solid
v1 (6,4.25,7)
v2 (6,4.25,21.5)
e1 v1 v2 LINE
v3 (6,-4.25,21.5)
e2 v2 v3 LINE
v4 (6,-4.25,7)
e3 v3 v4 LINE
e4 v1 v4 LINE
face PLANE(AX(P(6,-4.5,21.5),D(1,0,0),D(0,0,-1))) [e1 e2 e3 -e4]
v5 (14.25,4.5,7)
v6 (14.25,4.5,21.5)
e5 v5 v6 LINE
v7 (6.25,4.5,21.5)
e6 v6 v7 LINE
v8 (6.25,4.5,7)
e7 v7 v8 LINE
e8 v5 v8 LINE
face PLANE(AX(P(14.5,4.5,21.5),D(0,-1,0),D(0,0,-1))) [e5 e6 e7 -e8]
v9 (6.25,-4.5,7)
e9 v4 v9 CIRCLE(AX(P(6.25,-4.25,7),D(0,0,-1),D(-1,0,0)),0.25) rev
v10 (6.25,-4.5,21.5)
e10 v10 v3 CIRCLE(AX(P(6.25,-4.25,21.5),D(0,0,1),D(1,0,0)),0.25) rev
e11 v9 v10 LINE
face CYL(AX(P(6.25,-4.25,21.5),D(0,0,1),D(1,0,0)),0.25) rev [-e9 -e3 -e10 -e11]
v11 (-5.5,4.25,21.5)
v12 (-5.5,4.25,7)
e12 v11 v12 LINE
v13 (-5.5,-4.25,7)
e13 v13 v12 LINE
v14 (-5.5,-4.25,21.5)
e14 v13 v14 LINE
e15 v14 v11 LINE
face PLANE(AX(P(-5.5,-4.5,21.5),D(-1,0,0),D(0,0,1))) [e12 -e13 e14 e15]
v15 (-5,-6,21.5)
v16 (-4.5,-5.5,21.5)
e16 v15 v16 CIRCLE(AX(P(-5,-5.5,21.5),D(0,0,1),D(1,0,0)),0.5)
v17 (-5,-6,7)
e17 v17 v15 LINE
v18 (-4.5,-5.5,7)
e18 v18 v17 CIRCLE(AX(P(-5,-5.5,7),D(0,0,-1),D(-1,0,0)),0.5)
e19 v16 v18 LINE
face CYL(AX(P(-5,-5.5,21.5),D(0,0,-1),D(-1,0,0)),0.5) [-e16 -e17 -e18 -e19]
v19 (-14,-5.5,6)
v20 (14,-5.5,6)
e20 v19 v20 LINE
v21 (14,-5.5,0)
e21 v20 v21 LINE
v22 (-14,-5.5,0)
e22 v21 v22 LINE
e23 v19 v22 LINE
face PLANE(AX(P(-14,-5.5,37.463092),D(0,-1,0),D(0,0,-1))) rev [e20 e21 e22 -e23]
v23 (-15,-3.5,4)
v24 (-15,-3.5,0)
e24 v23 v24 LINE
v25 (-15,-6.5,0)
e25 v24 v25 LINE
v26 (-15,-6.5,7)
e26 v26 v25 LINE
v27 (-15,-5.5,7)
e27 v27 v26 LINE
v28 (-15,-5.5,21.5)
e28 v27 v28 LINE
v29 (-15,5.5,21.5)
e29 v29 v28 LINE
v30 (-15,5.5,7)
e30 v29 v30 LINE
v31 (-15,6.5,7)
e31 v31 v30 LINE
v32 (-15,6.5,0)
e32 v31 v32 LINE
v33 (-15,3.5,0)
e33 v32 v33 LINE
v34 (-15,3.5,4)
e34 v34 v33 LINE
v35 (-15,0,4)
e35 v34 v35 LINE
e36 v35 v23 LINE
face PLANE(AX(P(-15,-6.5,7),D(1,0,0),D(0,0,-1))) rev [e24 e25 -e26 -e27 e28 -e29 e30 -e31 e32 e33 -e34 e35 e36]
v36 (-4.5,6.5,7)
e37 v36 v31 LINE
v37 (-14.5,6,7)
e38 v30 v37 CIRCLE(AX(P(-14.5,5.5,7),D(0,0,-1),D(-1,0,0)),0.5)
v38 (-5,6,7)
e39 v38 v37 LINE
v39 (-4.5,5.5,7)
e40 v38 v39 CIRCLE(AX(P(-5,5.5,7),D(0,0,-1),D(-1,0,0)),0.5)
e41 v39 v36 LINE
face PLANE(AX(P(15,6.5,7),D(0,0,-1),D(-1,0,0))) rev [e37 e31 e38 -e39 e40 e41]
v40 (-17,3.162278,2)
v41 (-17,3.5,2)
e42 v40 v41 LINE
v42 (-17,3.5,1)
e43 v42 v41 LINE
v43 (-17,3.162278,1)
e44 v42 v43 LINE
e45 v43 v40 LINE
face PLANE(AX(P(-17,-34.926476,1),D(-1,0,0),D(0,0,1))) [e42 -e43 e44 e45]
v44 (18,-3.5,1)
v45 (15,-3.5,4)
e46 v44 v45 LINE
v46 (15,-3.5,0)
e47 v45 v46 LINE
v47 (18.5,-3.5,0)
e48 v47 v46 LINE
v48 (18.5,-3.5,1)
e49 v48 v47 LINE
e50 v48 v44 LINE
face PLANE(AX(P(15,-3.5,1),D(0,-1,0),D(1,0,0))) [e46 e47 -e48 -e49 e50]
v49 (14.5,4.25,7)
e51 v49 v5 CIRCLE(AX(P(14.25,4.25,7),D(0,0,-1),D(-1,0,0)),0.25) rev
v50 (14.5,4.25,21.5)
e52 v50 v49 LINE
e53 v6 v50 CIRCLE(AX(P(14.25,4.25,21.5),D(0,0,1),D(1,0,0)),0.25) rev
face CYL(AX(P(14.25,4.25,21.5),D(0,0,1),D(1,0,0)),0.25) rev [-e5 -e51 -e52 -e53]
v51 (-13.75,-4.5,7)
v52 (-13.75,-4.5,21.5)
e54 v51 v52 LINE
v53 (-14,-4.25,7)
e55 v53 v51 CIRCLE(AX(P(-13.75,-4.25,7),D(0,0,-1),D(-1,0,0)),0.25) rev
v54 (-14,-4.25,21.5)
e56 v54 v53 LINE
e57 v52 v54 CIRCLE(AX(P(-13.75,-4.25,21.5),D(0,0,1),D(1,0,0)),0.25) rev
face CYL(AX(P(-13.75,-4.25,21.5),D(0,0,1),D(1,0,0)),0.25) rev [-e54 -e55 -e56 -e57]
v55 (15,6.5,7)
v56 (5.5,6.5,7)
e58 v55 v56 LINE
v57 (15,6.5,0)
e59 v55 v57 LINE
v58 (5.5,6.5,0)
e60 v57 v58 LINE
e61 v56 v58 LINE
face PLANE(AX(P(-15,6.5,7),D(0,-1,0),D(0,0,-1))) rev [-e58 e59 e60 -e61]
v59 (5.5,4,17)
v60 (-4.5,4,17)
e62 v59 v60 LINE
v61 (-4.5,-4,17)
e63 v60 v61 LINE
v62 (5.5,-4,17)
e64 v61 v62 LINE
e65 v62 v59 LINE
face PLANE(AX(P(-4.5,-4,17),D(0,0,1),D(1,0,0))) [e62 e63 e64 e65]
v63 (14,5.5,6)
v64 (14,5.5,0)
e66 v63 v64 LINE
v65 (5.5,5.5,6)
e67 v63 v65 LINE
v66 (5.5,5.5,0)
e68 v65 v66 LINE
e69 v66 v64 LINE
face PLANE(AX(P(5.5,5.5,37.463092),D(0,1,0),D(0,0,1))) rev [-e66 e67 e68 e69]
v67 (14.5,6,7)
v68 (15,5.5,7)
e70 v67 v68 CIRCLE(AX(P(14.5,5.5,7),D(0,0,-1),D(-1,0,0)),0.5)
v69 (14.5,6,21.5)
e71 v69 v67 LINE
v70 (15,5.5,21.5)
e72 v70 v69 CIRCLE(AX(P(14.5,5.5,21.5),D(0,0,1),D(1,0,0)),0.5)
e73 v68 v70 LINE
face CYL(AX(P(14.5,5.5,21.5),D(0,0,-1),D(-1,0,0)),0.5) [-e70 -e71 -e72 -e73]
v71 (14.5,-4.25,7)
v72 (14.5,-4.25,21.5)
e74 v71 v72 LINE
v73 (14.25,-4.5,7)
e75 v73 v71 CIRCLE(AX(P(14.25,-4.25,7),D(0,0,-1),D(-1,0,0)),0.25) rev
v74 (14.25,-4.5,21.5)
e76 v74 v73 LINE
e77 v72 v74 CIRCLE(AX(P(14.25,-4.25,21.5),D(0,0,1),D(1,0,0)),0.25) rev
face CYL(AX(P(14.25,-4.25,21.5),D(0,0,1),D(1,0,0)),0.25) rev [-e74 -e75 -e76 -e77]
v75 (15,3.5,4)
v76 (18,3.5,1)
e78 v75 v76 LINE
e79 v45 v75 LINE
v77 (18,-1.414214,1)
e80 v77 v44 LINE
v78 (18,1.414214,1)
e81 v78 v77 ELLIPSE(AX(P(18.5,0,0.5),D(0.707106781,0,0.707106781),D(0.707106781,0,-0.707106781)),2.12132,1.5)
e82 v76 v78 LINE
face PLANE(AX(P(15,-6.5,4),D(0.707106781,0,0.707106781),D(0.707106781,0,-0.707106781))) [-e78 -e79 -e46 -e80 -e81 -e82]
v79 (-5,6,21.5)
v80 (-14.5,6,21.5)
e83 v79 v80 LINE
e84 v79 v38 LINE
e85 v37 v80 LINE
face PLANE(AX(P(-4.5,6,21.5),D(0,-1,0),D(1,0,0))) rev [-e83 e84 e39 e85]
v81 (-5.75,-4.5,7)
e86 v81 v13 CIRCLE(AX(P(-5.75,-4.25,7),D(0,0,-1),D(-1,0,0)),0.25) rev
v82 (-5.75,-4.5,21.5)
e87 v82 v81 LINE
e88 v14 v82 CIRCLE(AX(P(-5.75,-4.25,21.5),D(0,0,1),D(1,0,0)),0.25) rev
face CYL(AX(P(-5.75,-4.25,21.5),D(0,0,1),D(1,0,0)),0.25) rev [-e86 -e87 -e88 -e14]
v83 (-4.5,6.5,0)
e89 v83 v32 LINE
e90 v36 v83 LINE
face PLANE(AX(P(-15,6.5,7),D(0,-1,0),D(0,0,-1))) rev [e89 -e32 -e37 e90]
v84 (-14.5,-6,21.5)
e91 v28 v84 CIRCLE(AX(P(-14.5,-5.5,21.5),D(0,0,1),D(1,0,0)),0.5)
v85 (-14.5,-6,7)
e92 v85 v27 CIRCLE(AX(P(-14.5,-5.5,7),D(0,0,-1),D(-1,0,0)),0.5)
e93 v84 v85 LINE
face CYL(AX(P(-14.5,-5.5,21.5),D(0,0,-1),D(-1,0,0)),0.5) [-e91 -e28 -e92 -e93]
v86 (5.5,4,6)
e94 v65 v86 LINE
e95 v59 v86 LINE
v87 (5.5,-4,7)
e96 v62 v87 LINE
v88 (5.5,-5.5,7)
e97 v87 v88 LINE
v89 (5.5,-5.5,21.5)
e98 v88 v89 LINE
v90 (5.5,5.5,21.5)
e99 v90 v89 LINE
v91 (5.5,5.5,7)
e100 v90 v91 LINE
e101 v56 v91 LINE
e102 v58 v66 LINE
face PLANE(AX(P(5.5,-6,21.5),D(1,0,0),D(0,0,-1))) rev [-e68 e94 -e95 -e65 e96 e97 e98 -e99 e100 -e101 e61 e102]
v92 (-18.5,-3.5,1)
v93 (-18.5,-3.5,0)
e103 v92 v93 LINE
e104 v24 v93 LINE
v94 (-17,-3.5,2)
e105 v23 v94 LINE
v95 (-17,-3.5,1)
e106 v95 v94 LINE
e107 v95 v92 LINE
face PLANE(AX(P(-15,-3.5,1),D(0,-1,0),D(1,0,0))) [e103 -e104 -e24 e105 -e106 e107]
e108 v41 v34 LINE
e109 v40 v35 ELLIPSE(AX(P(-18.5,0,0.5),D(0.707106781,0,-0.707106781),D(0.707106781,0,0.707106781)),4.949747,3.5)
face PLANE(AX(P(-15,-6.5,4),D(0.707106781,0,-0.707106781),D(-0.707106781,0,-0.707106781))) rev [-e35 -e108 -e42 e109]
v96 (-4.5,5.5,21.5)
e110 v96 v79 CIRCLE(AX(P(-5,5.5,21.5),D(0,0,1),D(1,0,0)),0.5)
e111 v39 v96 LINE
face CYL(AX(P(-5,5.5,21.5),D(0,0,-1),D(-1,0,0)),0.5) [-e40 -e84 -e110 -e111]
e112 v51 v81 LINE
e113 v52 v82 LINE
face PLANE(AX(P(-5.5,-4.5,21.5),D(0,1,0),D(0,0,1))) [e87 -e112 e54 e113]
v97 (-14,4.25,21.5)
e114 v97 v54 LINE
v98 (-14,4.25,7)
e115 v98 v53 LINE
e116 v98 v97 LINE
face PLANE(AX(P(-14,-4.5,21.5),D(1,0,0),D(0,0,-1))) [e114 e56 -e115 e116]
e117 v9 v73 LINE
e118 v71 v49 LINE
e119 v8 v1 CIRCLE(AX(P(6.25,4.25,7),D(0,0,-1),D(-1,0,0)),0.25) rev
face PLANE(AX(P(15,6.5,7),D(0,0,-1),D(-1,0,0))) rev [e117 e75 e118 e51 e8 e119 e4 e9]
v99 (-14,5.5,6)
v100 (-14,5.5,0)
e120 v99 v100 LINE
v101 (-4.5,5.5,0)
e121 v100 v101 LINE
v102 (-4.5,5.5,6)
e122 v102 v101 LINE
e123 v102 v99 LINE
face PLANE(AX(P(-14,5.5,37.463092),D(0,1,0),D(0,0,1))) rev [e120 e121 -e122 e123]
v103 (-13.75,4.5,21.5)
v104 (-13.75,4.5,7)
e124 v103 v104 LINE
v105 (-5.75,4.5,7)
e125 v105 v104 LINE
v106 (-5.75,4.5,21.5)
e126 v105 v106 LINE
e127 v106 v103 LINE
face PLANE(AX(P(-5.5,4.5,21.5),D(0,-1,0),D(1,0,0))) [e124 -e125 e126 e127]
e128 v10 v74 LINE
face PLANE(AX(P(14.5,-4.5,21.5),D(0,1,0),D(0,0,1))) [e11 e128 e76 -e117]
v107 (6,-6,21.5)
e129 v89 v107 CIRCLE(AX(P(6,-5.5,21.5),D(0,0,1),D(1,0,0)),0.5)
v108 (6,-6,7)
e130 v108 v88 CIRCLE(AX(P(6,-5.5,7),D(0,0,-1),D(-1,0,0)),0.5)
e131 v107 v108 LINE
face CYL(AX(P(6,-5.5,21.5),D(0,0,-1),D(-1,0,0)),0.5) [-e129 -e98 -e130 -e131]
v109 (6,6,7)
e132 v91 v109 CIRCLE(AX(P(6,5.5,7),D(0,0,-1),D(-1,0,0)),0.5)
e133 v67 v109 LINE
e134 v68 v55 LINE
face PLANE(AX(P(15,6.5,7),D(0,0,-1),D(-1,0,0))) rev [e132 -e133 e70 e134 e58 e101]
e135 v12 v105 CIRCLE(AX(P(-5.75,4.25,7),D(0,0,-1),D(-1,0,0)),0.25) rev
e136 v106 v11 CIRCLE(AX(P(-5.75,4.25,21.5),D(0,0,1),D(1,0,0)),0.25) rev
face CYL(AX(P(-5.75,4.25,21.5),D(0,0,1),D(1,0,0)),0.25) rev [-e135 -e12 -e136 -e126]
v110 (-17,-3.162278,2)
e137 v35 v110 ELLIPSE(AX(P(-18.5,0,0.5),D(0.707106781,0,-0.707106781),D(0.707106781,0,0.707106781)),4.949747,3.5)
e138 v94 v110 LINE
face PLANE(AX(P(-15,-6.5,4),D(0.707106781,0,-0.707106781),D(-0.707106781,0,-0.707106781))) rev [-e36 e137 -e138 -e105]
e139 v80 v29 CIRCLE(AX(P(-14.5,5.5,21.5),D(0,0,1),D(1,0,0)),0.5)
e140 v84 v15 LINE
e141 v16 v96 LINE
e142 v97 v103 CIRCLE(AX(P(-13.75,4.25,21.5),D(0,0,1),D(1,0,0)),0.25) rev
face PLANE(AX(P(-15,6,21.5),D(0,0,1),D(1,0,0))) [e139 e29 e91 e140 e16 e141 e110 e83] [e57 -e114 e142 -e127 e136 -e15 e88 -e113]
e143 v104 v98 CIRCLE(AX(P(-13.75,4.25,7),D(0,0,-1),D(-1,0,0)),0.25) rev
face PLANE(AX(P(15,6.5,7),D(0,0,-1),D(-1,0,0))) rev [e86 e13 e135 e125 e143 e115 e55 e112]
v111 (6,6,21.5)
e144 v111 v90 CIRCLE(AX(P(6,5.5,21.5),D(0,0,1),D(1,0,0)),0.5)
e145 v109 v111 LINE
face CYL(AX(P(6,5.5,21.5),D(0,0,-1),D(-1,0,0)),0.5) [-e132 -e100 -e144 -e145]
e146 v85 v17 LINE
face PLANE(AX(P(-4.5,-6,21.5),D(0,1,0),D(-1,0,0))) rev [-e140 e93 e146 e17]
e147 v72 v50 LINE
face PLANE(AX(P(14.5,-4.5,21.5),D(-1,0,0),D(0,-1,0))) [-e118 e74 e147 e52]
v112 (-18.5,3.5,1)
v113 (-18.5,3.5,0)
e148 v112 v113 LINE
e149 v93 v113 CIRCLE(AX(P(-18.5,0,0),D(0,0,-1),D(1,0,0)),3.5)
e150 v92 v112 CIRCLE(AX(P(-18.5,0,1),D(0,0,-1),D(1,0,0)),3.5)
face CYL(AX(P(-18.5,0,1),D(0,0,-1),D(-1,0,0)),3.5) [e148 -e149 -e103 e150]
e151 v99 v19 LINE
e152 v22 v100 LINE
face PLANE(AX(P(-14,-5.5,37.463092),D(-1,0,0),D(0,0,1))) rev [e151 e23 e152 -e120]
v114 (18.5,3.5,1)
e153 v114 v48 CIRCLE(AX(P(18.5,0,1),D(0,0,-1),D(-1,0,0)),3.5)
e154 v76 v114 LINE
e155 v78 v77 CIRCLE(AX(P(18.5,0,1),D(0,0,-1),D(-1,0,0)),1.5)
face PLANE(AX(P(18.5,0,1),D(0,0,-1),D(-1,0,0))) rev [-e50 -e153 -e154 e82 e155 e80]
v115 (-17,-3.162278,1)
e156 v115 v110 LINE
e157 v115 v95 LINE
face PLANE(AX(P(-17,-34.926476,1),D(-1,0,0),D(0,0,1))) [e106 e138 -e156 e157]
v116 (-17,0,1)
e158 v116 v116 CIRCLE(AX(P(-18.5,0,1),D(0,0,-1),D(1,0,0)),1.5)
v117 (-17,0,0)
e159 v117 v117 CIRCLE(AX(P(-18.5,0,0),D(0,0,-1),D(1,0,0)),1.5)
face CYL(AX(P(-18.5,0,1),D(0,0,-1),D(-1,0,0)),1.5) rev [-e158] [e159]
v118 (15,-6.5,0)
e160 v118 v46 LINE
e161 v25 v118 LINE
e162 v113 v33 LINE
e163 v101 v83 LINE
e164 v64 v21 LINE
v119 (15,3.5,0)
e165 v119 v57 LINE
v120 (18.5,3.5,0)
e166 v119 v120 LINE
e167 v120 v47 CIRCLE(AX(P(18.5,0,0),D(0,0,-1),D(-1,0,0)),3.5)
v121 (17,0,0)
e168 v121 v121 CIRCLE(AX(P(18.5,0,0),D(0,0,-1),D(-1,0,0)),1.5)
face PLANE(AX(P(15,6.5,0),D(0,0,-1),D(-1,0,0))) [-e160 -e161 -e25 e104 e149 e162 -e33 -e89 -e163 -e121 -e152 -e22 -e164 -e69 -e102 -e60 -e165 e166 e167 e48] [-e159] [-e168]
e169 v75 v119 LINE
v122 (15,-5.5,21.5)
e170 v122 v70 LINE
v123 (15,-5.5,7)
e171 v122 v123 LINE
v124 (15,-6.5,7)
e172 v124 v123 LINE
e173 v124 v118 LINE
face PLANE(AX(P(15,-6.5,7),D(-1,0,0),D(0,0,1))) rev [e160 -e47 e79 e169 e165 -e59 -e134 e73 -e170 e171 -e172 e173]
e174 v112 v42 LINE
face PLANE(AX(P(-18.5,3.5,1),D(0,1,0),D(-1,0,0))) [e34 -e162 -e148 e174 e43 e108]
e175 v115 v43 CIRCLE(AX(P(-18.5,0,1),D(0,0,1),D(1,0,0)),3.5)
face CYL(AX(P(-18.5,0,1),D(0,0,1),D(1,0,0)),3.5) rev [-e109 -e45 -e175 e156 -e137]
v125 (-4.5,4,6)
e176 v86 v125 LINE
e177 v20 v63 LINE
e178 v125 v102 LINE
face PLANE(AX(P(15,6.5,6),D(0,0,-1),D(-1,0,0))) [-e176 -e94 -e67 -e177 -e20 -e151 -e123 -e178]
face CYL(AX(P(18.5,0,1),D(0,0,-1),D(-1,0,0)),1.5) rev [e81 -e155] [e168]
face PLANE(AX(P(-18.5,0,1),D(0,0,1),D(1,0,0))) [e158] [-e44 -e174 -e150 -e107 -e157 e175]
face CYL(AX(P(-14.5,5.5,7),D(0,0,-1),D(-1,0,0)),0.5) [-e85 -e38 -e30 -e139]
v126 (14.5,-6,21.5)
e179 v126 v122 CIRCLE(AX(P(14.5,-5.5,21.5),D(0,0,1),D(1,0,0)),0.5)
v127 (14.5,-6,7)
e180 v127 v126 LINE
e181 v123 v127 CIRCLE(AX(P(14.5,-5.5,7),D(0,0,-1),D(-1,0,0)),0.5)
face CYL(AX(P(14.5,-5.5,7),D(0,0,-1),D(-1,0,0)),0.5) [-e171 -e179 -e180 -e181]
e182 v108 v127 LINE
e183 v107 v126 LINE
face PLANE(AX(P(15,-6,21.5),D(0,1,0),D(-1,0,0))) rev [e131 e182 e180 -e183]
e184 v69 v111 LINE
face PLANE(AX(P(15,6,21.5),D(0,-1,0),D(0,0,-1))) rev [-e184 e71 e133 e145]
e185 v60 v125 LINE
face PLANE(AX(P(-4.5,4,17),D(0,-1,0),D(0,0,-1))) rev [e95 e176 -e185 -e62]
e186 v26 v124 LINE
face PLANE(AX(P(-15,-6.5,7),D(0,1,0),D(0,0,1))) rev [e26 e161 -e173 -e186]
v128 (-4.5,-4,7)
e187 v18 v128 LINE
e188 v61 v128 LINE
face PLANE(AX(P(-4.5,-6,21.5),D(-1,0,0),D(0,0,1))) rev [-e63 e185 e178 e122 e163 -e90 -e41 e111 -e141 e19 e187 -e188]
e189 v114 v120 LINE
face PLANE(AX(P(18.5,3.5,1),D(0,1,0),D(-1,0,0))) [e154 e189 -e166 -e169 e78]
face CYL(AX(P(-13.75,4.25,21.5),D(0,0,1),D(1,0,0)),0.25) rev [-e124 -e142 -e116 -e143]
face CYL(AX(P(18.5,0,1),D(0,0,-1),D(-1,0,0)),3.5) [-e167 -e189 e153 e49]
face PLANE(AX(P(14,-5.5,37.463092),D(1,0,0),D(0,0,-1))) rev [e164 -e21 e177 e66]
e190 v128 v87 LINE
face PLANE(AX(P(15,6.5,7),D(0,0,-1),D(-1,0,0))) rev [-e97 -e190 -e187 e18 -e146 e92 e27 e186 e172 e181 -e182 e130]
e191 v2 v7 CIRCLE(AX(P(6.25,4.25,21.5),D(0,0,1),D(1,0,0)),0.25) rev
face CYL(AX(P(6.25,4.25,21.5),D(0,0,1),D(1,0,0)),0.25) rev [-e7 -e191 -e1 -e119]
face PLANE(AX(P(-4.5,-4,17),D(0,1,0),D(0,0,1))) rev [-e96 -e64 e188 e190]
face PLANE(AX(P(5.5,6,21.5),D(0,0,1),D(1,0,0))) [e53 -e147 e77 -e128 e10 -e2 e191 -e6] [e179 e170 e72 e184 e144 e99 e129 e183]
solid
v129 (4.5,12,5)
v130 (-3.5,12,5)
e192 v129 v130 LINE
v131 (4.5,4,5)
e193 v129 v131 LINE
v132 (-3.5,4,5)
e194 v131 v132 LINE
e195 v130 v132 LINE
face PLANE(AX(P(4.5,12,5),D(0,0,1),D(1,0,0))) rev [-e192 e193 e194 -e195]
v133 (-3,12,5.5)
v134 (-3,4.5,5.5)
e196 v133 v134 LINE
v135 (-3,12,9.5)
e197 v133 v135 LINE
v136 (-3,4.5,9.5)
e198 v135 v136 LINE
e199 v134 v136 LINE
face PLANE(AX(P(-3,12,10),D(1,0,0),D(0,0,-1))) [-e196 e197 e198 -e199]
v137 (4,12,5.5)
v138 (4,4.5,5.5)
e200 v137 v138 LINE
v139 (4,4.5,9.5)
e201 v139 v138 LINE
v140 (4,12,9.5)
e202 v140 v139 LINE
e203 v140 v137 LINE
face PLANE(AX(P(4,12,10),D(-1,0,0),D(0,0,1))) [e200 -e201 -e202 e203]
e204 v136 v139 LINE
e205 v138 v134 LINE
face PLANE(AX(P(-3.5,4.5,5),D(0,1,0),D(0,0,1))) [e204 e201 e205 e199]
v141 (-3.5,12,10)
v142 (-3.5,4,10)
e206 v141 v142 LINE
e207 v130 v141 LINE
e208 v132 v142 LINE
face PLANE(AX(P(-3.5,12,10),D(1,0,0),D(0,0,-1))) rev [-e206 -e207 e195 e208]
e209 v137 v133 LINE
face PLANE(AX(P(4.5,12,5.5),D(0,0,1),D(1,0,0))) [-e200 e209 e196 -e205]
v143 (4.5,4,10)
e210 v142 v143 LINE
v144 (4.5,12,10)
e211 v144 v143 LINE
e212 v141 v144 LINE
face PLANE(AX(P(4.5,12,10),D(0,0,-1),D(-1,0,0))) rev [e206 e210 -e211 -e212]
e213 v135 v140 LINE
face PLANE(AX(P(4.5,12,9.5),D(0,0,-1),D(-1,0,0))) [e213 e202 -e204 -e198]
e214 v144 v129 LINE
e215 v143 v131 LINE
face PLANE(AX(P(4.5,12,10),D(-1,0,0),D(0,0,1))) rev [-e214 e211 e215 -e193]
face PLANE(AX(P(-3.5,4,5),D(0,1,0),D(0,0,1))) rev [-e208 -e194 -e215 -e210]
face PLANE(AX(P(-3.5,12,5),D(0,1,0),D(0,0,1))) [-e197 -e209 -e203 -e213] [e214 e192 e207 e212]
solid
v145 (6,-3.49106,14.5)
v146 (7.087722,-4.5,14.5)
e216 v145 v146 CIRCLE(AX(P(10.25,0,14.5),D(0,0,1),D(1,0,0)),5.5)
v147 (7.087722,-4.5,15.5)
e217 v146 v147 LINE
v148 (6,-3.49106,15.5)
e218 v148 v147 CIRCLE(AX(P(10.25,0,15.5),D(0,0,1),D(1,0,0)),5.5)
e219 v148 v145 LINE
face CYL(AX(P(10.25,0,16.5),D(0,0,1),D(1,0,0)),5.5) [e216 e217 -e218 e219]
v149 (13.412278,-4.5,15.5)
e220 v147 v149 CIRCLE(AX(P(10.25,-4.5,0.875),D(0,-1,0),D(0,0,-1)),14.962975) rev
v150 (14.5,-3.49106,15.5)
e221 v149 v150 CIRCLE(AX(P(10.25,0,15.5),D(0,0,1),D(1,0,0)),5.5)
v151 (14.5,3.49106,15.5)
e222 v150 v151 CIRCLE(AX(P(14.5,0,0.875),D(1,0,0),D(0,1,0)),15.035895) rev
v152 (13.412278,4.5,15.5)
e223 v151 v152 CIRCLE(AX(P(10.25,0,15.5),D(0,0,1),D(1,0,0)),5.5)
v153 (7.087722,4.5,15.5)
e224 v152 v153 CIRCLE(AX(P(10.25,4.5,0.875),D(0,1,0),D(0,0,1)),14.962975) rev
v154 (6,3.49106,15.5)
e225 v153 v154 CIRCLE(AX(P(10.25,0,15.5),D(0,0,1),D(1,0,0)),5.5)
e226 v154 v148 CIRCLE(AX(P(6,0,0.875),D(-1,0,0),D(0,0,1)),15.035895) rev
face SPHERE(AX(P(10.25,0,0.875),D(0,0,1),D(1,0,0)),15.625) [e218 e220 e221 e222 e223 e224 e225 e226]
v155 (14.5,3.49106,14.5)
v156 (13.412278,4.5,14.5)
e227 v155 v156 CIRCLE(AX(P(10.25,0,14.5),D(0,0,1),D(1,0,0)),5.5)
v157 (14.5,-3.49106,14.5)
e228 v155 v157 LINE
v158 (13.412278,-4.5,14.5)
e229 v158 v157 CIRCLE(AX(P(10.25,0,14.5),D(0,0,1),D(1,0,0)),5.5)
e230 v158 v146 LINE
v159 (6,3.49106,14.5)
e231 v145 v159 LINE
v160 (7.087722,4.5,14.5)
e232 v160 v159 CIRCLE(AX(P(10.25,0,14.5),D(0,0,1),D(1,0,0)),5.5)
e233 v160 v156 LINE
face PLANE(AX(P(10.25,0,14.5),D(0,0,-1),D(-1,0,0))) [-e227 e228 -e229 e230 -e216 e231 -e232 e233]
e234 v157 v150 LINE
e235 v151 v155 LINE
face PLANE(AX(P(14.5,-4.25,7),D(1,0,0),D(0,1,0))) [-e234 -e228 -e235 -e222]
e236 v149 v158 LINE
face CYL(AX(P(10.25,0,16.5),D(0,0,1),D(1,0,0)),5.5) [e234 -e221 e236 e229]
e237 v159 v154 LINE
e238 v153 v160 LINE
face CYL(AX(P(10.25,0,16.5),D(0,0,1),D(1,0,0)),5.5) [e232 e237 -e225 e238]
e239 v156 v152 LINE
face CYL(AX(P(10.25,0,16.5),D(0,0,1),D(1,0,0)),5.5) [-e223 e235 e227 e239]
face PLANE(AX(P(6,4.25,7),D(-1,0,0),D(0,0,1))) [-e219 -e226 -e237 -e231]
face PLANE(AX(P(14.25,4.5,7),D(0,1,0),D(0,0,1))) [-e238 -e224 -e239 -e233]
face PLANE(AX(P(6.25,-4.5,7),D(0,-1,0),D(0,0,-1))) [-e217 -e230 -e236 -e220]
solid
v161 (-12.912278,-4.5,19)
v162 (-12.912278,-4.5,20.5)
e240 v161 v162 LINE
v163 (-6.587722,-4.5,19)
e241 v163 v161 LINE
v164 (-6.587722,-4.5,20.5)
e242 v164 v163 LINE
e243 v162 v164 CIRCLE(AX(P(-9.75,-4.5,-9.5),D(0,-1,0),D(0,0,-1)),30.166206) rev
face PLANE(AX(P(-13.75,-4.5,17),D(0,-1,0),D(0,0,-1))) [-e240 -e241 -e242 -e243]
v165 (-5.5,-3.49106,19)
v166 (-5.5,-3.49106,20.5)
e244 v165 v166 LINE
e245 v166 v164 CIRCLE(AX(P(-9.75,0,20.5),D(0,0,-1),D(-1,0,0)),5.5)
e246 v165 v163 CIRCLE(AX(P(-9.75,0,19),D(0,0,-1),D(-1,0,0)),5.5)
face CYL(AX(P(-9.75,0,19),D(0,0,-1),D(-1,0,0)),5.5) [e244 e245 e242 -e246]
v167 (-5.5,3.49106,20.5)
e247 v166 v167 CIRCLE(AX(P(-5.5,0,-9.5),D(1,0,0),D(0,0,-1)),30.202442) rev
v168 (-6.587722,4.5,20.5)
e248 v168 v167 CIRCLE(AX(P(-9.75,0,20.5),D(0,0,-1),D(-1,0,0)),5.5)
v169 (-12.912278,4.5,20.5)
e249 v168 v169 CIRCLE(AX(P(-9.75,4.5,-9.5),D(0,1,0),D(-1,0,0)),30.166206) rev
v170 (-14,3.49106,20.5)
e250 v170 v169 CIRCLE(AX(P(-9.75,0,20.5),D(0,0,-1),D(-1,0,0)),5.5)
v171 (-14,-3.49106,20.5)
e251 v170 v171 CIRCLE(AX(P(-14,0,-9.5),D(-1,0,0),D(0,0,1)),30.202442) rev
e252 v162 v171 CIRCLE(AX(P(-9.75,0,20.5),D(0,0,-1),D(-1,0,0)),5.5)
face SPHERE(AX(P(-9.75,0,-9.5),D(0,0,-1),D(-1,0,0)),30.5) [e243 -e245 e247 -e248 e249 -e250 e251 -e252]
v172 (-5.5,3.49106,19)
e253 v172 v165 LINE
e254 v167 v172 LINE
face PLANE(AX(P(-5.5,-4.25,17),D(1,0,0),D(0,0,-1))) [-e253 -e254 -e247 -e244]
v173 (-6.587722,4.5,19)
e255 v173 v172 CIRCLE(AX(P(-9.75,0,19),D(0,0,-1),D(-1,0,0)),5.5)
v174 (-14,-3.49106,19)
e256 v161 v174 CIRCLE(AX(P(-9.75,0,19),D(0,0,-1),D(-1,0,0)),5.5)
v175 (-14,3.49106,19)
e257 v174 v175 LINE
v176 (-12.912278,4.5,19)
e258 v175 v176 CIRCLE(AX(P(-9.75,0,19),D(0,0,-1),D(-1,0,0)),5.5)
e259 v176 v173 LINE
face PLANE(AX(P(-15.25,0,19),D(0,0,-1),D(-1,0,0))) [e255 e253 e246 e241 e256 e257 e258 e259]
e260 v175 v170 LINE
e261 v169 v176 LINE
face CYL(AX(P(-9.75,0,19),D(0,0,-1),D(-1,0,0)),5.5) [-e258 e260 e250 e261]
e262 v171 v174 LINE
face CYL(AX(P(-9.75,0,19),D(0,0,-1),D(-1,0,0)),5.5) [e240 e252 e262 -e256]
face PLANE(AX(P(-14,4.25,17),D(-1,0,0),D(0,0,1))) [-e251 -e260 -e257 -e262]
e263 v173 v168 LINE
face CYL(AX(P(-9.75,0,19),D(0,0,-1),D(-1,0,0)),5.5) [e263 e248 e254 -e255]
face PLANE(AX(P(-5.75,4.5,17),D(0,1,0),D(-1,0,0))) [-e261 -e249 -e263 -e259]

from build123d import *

# Parameters (mm, degrees)
SKETCH5_W           = 30
SKETCH5_H           = 13
BOSS_EXTRUDE1_DEPTH = 7
SKETCH6_W           = 10.5
SKETCH6_H           = 12
SKETCH6_W_2         = 8.5
SKETCH6_H_2         = 9
SKETCH6_W_3         = 9.5
BOSS_EXTRUDE2_DEPTH = 14.5
SKETCH7_W           = 10
SKETCH7_H           = 8
BOSS_EXTRUDE3_DEPTH = 10
FILLET1_R           = 0.25
FILLET2_R           = 0.5
SKETCH8_R           = 1.5
BOSS_EXTRUDE4_DEPTH = 1
CHAMFER1_SIZE       = 3
CUT_EXTRUDE1_START  = -16
CUT_EXTRUDE1_DEPTH  = 16
SKETCH12_OUTSIDE_W  = 56.134
SKETCH12_OUTSIDE_H  = 25.134
CUT_EXTRUDE2_DEPTH  = 2.5
SKETCH14_OUTSIDE_W  = 56.134
SKETCH14_OUTSIDE_H  = 25.134
CUT_EXTRUDE5_DEPTH  = 7
CUT_EXTRUDE6_DEPTH  = 6
SKETCH16_W          = 10
SKETCH16_H          = 2.5
CUT_EXTRUDE7_DEPTH  = 1
SKETCH17_W          = 8
SKETCH17_H          = 5
BOSS_EXTRUDE5_DEPTH = 8
SHELL1_T            = -0.5


with BuildPart() as part:
    # Sketch5 → Boss-Extrude1 (new body)
    with BuildSketch(Plane.XY):
        Rectangle(SKETCH5_W, SKETCH5_H)
    extrude(amount=BOSS_EXTRUDE1_DEPTH)

    # Sketch6 → Boss-Extrude2 (add)
    # profile 1 of 2: a face of its own
    with BuildSketch(Plane.XY.offset(7)):
        with Locations((-9.75, 0)):
            Rectangle(SKETCH6_W, SKETCH6_H)
        with Locations((-9.75, 0)):
            Rectangle(SKETCH6_W_2, SKETCH6_H_2, mode=Mode.SUBTRACT)
    # profile 2 of 2: a face of its own
    with BuildSketch(Plane.XY.offset(7)):
        with Locations((10.25, 0)):
            Rectangle(SKETCH6_W_3, SKETCH6_H)
        with Locations((10.25, 0)):
            Rectangle(SKETCH6_W_2, SKETCH6_H_2, mode=Mode.SUBTRACT)
    extrude(amount=BOSS_EXTRUDE2_DEPTH)

    # Sketch7 → Boss-Extrude3 (add)
    with BuildSketch(Plane.XY.offset(7)):
        with Locations((0.5, 0)):
            Rectangle(SKETCH7_W, SKETCH7_H)
    extrude(amount=BOSS_EXTRUDE3_DEPTH)

    # Fillet1
    fillet1_edges = [part.edges().sort_by_distance(p)[0] for p in [
        (-14, -4.5, 14.25),
        (-5.5, -4.5, 14.25),
        (-5.5, 4.5, 14.25),
        (-14, 4.5, 14.25),
        (6, -4.5, 14.25),
        (14.5, -4.5, 14.25),
        (14.5, 4.5, 14.25),
        (6, 4.5, 14.25),
    ]]
    fillet(fillet1_edges, radius=FILLET1_R)

    # Fillet2
    fillet2_edges = [part.edges().sort_by_distance(p)[0] for p in [
        (15, -6, 14.25),
        (5.5, -6, 14.25),
        (-4.5, -6, 14.25),
        (-15, -6, 14.25),
        (-15, 6, 14.25),
        (5.5, 6, 14.25),
        (15, 6, 14.25),
        (-4.5, 6, 14.25),
    ]]
    fillet(fillet2_edges, radius=FILLET2_R)

    # Sketch8 → Boss-Extrude4 (add)
    # profile 1 of 2: a face of its own
    with BuildSketch(Plane(origin=(0, 0, 0), x_dir=(-1, 0, 0), z_dir=(0, 0, -1))):
        with BuildLine():
            Line((-18.5, 3.5), (-15, 3.5))
            Line((-15, 3.5), (-15, -3.5))
            Line((-15, -3.5), (-18.5, -3.5))
            ThreePointArc((-18.5, -3.5), (-22, 0), (-18.5, 3.5))
        make_face()
        with Locations((-18.5, 0)):
            Circle(SKETCH8_R, mode=Mode.SUBTRACT)
    # profile 2 of 2: a face of its own
    with BuildSketch(Plane(origin=(0, 0, 0), x_dir=(-1, 0, 0), z_dir=(0, 0, -1))):
        with BuildLine():
            Line((15, -3.5), (18.5, -3.5))
            ThreePointArc((18.5, -3.5), (22, 0), (18.5, 3.5))
            Line((18.5, 3.5), (15, 3.5))
            Line((15, 3.5), (15, -3.5))
        make_face()
        with Locations(Location((18.5, 0, 0), (0, 0, 180))):
            Circle(SKETCH8_R, mode=Mode.SUBTRACT)
    extrude(amount=-BOSS_EXTRUDE4_DEPTH)

    # Chamfer1
    # the kernel refuses this chamfer: 3 mm, written as the material it adds along each edge
    with BuildSketch(Plane(origin=(15, 3.5, 1), x_dir=(-0.0274958766105862, 0, 0.9996219169112968), z_dir=(0, -1, 0))) as chamfer1_piece_1_section:
        Polygon((CHAMFER1_SIZE * 0.999621916911, -CHAMFER1_SIZE * 0.0274958766106), (-CHAMFER1_SIZE * 0.0274958766106, -CHAMFER1_SIZE * 0.999621916911), (0, 0), align=None)
    chamfer1_piece_1 = extrude(amount=7, mode=Mode.PRIVATE)
    chamfer1_piece_1 = chamfer1_piece_1 - Plane(origin=(18.5, 0, 2.014951553), x_dir=(-1, 0, 0), z_dir=(0, 0, -1)) * Cylinder(1.5, 26, mode=Mode.PRIVATE)
    add(chamfer1_piece_1)
    with BuildSketch(Plane(origin=(-15, 3.5, 1), x_dir=(0.0274958766105862, 0, 0.9996219169112968), z_dir=(0, -1, 0))) as chamfer1_piece_2_section:
        Polygon((CHAMFER1_SIZE * 0.999621916911, CHAMFER1_SIZE * 0.0274958766106), (-CHAMFER1_SIZE * 0.0274958766106, CHAMFER1_SIZE * 0.999621916911), (0, 0), align=None)
    chamfer1_piece_2 = extrude(amount=7, mode=Mode.PRIVATE)
    chamfer1_piece_2 = chamfer1_piece_2 - Plane(origin=(-18.5, 0, 2.014951553), x_dir=(1, 0, 0), z_dir=(0, 0, -1)) * Cylinder(1.5, 26, mode=Mode.PRIVATE)
    add(chamfer1_piece_2)

    # Sketch10 → Cut-Extrude1 (cut)
    with BuildSketch(Plane.XY.offset(17).offset(CUT_EXTRUDE1_START)):
        with BuildLine():
            Line((-17, 3.5), (-18.5, 3.5))
            ThreePointArc((-18.5, 3.5), (-22, 0), (-18.5, -3.5))
            Line((-18.5, -3.5), (-17, -3.5))
            Line((-17, -3.5), (-17, -3.16227766))
            ThreePointArc((-17, -3.16227766), (-15.541960108, -1.870828693), (-15, 0))
            ThreePointArc((-15, 0), (-15.541960108, 1.870828693), (-17, 3.16227766))
            Line((-17, 3.16227766), (-17, 3.5))
        make_face()
    extrude(amount=CUT_EXTRUDE1_DEPTH, mode=Mode.SUBTRACT)

    # Sketch15 → Cut-Extrude6 (cut)
    with BuildSketch(Plane(origin=(0, 0, 0), x_dir=(-1, 0, 0), z_dir=(0, 0, -1))):
        Polygon((14, -5.5), (-14, -5.5), (-14, 5.5), (-5.5, 5.5), (-5.5, 6.5), (4.5, 6.5), (4.5, 5.5), (14, 5.5), align=None)
    extrude(amount=-CUT_EXTRUDE6_DEPTH, mode=Mode.SUBTRACT)

    # Sketch16 → Cut-Extrude7 (cut)
    with BuildSketch(Plane(origin=(0, 0, 6), x_dir=(-1, 0, 0), z_dir=(0, 0, -1))):
        with Locations((-0.5, 5.25)):
            Rectangle(SKETCH16_W, SKETCH16_H)
    extrude(amount=-CUT_EXTRUDE7_DEPTH, mode=Mode.SUBTRACT)


with BuildPart() as body_2:
    # Sketch11 → Revolve1 (revolve)
    with BuildSketch(Plane(origin=(0, 0, 0), x_dir=(-1, 0, 0), z_dir=(0, 1, 0))):
        with BuildLine():
            Line((15.25, 20.5), (15.25, 19))
            Line((15.25, 19), (9.75, 19))
            Line((9.75, 19), (9.75, 21))
            ThreePointArc((9.75, 21), (12.511340254, 20.874742797), (15.25, 20.5))
        make_face()
    revolve(axis=Axis((-9.75, 0, 19), (0, 0, 1)))

    # Sketch12 outside → Cut-Extrude2 (cut)
    with BuildSketch(Plane.XY.offset(21.5)):
        Rectangle(SKETCH12_OUTSIDE_W, SKETCH12_OUTSIDE_H)
        with BuildLine():
            Line((-14, 4.25), (-14, -4.25))
            ThreePointArc((-14, -4.25), (-13.926776695, -4.426776695), (-13.75, -4.5))
            Line((-13.75, -4.5), (-5.75, -4.5))
            ThreePointArc((-5.75, -4.5), (-5.573223305, -4.426776695), (-5.5, -4.25))
            Line((-5.5, -4.25), (-5.5, 4.25))
            ThreePointArc((-5.5, 4.25), (-5.573223305, 4.426776695), (-5.75, 4.5))
            Line((-5.75, 4.5), (-13.75, 4.5))
            ThreePointArc((-13.75, 4.5), (-13.926776695, 4.426776695), (-14, 4.25))
        make_face(mode=Mode.SUBTRACT)
    extrude(amount=-CUT_EXTRUDE2_DEPTH, mode=Mode.SUBTRACT)


with BuildPart() as body_3:
    # Sketch13 → Revolve2 (revolve)
    with BuildSketch(Plane(origin=(0, 0, 0), x_dir=(-1, 0, 0), z_dir=(0, 1, 0))):
        with BuildLine():
            Line((-10.25, 14.5), (-15.75, 14.5))
            Line((-15.75, 14.5), (-15.75, 15.5))
            ThreePointArc((-15.75, 15.5), (-13.045084972, 16.247967345), (-10.25, 16.5))
            Line((-10.25, 16.5), (-10.25, 14.5))
        make_face()
    revolve(axis=Axis((10.25, 0, 16.5), (0, 0, -1)))

    # Sketch14 outside → Cut-Extrude5 (cut)
    with BuildSketch(Plane.XY.offset(21.5)):
        Rectangle(SKETCH14_OUTSIDE_W, SKETCH14_OUTSIDE_H)
        with BuildLine():
            Line((14.25, 4.5), (6.25, 4.5))
            ThreePointArc((6.25, 4.5), (6.073223305, 4.426776695), (6, 4.25))
            Line((6, 4.25), (6, -4.25))
            ThreePointArc((6, -4.25), (6.073223305, -4.426776695), (6.25, -4.5))
            Line((6.25, -4.5), (14.25, -4.5))
            ThreePointArc((14.25, -4.5), (14.426776695, -4.426776695), (14.5, -4.25))
            Line((14.5, -4.25), (14.5, 4.25))
            ThreePointArc((14.5, 4.25), (14.426776695, 4.426776695), (14.25, 4.5))
        make_face(mode=Mode.SUBTRACT)
    extrude(amount=-CUT_EXTRUDE5_DEPTH, mode=Mode.SUBTRACT)


with BuildPart() as body_4:
    # Sketch17 → Boss-Extrude5 (new body)
    with BuildSketch(Plane(origin=(0, 4, 0), x_dir=(1, 0, 0), z_dir=(0, 1, 0))):
        with Locations((0.5, -7.5)):
            Rectangle(SKETCH17_W, SKETCH17_H)
    extrude(amount=BOSS_EXTRUDE5_DEPTH)

    # Shell1
    shell1_openings = [body_4.faces().sort_by_distance(p)[0] for p in [
        (0.5, 12, 7.5),
    ]]
    offset(amount=SHELL1_T, openings=shell1_openings, kind=Kind.INTERSECTION)


solid = Compound([part.part, body_2.part, body_3.part, body_4.part])
